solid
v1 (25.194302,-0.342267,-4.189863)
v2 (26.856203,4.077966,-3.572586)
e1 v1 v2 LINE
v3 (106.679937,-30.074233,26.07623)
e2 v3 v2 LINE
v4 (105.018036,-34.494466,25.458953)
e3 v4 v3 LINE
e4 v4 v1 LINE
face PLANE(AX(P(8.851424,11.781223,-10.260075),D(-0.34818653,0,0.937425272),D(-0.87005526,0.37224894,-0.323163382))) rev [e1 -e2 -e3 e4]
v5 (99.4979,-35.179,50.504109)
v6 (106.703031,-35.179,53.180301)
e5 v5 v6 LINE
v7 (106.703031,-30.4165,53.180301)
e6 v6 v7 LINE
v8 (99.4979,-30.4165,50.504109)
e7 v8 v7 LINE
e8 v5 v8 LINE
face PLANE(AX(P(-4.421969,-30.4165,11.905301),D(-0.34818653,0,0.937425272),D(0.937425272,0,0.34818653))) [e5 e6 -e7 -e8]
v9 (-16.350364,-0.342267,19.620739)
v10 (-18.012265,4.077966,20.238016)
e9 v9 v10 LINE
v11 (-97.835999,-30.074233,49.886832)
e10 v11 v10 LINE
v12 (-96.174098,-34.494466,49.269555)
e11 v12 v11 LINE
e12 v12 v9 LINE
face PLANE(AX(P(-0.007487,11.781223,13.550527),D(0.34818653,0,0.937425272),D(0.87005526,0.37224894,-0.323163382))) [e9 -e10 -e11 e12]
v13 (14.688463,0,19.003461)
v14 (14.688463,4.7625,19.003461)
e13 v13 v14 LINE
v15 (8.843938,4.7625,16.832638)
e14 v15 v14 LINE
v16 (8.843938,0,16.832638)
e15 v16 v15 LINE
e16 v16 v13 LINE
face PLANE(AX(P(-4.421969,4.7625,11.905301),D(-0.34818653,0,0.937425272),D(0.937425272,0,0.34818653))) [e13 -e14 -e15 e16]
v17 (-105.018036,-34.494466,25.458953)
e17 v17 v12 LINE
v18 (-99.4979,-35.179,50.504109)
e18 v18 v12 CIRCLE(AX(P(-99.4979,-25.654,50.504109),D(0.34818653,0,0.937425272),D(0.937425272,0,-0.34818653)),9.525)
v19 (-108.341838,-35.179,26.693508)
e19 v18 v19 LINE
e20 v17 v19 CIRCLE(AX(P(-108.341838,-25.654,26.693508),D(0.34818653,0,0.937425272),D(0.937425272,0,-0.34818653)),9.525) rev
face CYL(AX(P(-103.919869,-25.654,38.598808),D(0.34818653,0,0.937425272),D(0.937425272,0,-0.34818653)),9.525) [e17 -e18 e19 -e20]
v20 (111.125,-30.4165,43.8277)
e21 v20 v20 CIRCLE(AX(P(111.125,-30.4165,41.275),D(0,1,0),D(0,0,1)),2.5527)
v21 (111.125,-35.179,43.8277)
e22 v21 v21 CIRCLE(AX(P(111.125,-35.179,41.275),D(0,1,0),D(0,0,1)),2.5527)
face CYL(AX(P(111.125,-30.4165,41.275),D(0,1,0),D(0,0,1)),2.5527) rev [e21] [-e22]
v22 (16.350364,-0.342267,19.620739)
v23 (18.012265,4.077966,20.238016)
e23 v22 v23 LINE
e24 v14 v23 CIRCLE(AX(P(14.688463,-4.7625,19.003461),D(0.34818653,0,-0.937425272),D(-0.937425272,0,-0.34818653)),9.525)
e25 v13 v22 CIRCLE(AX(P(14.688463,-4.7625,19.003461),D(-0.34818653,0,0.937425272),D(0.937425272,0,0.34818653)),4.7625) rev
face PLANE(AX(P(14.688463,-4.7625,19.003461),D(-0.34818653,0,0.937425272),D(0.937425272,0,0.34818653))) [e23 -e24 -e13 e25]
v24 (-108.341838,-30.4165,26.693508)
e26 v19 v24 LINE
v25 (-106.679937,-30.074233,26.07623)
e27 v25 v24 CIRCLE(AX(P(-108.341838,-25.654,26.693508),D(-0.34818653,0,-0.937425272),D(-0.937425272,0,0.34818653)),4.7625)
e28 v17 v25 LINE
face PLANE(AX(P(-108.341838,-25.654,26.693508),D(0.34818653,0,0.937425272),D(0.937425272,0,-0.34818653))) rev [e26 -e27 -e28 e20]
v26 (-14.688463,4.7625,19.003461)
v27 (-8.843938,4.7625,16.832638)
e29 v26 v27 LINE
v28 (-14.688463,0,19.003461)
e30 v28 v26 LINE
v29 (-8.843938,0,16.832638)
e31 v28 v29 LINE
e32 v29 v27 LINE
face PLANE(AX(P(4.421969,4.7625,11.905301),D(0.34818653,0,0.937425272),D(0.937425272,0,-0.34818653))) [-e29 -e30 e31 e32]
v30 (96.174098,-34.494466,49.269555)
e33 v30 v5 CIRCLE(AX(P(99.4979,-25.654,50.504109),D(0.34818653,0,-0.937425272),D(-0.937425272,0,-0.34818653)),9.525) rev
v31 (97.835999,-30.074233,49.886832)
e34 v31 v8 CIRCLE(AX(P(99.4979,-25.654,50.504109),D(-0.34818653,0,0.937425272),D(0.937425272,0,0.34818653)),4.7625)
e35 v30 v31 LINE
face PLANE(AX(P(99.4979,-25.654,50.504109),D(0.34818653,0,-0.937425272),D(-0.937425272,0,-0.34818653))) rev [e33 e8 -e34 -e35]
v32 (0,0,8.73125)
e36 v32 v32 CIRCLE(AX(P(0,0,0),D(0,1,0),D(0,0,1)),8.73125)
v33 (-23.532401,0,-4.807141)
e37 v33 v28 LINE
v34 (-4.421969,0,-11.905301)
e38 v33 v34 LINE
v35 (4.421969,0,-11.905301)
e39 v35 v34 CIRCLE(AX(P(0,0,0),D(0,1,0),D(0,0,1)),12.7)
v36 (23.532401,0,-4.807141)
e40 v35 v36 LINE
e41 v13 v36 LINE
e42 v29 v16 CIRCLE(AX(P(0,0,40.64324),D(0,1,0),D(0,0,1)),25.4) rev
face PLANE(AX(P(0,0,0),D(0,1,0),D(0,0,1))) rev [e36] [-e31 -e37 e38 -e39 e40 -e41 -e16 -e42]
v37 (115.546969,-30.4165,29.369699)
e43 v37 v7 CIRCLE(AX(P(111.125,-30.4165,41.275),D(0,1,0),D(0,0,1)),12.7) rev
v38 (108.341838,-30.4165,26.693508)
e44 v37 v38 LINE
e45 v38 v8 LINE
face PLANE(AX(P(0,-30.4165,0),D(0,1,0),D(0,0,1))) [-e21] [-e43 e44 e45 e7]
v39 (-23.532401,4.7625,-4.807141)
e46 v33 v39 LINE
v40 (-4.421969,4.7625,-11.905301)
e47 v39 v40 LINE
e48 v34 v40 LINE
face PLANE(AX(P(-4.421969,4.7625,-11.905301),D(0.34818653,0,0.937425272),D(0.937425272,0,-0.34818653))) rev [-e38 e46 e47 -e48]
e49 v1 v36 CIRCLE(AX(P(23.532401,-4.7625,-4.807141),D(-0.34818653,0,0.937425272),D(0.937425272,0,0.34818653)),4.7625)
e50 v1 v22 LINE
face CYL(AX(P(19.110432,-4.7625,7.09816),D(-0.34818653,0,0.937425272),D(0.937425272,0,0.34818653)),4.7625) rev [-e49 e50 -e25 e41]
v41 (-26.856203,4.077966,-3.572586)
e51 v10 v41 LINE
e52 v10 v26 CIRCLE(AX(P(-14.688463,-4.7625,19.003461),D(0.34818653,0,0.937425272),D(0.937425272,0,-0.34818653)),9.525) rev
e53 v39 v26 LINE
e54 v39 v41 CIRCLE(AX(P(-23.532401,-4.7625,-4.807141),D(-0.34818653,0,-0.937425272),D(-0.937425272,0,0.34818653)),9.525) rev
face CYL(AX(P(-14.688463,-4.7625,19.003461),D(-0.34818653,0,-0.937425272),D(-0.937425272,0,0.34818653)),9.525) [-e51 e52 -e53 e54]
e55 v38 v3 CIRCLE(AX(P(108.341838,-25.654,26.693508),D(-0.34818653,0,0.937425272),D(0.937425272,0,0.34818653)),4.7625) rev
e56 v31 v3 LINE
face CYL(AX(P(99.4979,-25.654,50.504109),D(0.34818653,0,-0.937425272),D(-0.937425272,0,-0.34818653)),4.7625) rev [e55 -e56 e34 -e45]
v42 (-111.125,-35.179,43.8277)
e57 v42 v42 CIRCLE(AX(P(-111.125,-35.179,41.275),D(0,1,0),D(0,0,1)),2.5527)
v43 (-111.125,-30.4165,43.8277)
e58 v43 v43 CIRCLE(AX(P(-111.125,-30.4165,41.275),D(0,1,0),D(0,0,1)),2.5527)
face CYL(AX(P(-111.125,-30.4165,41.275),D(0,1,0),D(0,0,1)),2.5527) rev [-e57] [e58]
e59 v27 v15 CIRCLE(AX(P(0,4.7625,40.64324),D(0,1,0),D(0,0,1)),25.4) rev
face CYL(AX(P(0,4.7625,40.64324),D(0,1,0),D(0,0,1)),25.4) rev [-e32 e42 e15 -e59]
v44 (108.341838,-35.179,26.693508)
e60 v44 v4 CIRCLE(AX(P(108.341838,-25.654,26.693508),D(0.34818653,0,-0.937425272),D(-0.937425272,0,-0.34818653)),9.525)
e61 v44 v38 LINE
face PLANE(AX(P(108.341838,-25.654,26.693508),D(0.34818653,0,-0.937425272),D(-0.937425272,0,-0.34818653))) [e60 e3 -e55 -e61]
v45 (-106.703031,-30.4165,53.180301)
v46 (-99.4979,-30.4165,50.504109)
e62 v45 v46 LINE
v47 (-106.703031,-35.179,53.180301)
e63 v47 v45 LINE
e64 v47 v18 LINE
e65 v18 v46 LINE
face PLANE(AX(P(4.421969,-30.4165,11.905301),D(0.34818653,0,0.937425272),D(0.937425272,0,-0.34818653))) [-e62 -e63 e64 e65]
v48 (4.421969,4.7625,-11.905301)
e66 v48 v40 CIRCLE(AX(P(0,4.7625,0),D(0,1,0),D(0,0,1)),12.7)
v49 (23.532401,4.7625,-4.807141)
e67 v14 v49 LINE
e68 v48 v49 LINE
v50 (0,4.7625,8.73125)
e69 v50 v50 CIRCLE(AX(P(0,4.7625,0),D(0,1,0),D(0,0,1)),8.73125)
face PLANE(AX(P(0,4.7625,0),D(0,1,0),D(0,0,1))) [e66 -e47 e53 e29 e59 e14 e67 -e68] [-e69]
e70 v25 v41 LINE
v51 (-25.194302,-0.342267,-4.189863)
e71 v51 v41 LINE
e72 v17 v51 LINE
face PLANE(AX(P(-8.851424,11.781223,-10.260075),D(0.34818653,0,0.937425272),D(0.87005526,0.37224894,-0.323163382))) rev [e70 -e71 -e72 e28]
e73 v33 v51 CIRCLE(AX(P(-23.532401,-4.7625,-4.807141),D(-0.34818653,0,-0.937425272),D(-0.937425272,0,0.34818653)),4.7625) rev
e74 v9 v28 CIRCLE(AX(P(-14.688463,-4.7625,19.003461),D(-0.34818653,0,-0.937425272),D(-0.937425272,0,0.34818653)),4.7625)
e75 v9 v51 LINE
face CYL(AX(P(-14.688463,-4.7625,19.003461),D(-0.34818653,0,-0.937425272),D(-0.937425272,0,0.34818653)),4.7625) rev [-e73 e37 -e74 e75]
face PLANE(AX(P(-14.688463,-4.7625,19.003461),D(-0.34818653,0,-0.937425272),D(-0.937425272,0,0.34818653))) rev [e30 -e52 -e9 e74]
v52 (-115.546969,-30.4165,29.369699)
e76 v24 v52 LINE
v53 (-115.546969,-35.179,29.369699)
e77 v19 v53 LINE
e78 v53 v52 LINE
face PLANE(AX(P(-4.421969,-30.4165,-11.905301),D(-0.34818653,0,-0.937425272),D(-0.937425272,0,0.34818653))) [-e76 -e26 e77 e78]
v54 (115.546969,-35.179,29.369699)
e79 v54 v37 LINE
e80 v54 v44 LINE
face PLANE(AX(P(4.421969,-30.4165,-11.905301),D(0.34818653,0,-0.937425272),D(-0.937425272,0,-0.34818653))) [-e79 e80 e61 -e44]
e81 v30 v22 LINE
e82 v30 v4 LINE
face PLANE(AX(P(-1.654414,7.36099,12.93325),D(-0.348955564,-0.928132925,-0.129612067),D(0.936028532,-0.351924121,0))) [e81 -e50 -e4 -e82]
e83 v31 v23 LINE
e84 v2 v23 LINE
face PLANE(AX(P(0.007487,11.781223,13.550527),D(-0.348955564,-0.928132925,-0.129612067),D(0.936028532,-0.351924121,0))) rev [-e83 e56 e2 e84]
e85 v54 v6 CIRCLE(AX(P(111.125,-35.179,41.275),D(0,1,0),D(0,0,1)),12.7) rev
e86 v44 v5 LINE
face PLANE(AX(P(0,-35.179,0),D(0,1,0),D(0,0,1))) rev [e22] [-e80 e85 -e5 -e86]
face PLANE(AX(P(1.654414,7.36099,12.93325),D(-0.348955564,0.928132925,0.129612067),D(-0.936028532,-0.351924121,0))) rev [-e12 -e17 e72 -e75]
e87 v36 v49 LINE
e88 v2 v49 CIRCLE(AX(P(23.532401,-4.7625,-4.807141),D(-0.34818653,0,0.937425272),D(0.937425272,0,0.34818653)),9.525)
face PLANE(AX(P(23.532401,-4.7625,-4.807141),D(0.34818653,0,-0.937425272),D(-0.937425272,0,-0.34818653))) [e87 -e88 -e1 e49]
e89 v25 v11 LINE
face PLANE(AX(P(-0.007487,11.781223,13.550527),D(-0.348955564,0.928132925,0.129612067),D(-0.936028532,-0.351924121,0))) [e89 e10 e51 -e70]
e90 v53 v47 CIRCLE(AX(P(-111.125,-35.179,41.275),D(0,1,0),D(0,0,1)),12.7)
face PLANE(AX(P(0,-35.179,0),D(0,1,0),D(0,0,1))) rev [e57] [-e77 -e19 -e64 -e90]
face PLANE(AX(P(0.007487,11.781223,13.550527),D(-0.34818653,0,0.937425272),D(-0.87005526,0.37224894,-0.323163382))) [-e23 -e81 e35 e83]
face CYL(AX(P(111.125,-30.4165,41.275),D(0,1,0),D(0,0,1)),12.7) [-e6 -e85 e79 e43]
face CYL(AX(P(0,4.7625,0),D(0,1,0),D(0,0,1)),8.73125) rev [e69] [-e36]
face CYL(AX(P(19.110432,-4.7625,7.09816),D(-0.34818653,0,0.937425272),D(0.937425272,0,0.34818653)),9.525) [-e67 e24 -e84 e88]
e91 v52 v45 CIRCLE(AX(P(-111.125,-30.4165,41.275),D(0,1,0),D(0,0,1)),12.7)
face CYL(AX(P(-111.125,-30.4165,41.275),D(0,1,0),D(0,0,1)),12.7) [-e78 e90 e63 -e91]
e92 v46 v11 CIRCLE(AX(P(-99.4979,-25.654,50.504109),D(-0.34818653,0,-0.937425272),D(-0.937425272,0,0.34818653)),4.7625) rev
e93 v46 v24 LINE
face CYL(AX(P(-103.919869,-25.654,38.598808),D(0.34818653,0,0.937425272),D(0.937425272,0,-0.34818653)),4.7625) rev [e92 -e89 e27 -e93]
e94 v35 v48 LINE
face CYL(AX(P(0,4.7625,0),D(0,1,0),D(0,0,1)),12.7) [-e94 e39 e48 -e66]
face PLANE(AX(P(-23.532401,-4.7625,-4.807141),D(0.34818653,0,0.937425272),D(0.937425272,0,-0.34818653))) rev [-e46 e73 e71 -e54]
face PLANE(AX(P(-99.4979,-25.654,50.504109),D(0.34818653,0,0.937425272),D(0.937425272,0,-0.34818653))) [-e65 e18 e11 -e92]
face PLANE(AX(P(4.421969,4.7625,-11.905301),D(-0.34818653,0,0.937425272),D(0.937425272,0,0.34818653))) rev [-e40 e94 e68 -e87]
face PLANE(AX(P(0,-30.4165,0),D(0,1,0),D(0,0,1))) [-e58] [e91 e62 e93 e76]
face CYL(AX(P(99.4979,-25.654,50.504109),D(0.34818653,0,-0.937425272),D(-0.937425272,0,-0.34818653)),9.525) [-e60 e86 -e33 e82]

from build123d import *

# Parameters (mm, degrees)
SKETCH1_R              = 12.7
SKETCH1_R_2            = 8.73125
BOSS_EXTRUDE1_DEPTH    = 4.7625
BOSS_EXTRUDE5_DEPTH    = 4.7625
BOSS_EXTRUDE2_DEPTH    = 4.7625
BOSS_EXTRUDE2_2_DEPTH  = 4.7625
BOSS_EXTRUDE3_DEPTH    = 12.7
FILLET2_R              = 25.4
F_10_CLEARANCE_HOLE1_D = 5.1054
CONVERT_SOLID1_START   = -12.7
CONVERT_SOLID1_DEPTH   = 25.4
CONVERT_SOLID1_2_DEPTH = 25.4
CONVERT_SOLID1_3_DEPTH = 25.4
CONVERT_SOLID1_4_DEPTH = 25.4


# Read off the part's stored shape, not the designer's step: Convert-Solid1
with BuildPart() as part:
    # Sketch1 → Boss-Extrude1 (new body)
    with BuildSketch(Plane(origin=(0, 0, 0), x_dir=(1, 0, 0), z_dir=(0, 1, 0))):
        with Locations(Location((0, 0, 0), (0, 0, 90))):
            Circle(SKETCH1_R)
        with Locations(Location((0, 0, 0), (0, 0, 90))):
            Circle(SKETCH1_R_2, mode=Mode.SUBTRACT)
    extrude(amount=BOSS_EXTRUDE1_DEPTH)

    # Sketch1<5> → Boss-Extrude5 (add)
    with BuildSketch(Plane(origin=(0, 0, 0), x_dir=(1, 0, 0), z_dir=(0, 1, 0))):
        with BuildLine():
            Line((-25.256245596, 4.166855334), (-16.412307744, -19.643746575))
            Line((-16.412307744, -19.643746575), (0, -13.547746556))
            Line((0, -13.547746556), (-4.421968926, -11.905300955))
            ThreePointArc((-4.421968926, -11.905300955), (-12.7, 0), (-4.421968926, 11.905300955))
            Line((-4.421968926, 11.905300955), (-25.256245596, 4.166855334))
        make_face()
        with BuildLine():
            Line((-4.421968926, -11.905300955), (0, -13.547746556))
            Line((0, -13.547746556), (4.421968926, -11.905300955))
            ThreePointArc((4.421968926, -11.905300955), (0, -12.7), (-4.421968926, -11.905300955))
        make_face()
        with BuildLine():
            Line((4.421968926, -11.905300955), (0, -13.547746556))
            Line((0, -13.547746556), (16.412307744, -19.643746575))
            Line((16.412307744, -19.643746575), (25.256245596, 4.166855334))
            Line((25.256245596, 4.166855334), (4.421968926, 11.905300955))
            ThreePointArc((4.421968926, 11.905300955), (10.427104233, 7.250206709), (12.7, 0))
            ThreePointArc((12.7, 0), (10.427104233, -7.250206709), (4.421968926, -11.905300955))
        make_face()
    extrude(amount=BOSS_EXTRUDE5_DEPTH)



with BuildPart() as body_2:
    # Sketch3 → Boss-Extrude2 (new body)
    with BuildSketch(Plane(origin=(0, -35.179, 0), x_dir=(1, 0, 0), z_dir=(0, 1, 0))):
        with BuildLine():
            Line((-106.61799321, -26.053222351), (-115.546968926, -29.369699045))
            ThreePointArc((-115.546968926, -29.369699045), (-123.030300955, -45.696968926), (-106.703031074, -53.180300955))
            Line((-106.703031074, -53.180300955), (-97.774055358, -49.86382426))
            Line((-97.774055358, -49.86382426), (-106.61799321, -26.053222351))
        make_face()
    extrude(amount=BOSS_EXTRUDE2_DEPTH)


with BuildPart() as body_3:
    # Sketch3 → Boss-Extrude2 2 (new body)
    with BuildSketch(Plane(origin=(0, -35.179, 0), x_dir=(1, 0, 0), z_dir=(0, 1, 0))):
        with BuildLine():
            ThreePointArc((115.546968926, -29.369699045), (123.030300955, -45.696968926), (106.703031074, -53.180300955))
            Line((106.703031074, -53.180300955), (97.774055358, -49.86382426))
            Line((97.774055358, -49.86382426), (106.61799321, -26.053222351))
            Line((106.61799321, -26.053222351), (115.546968926, -29.369699045))
        make_face()
    extrude(amount=BOSS_EXTRUDE2_2_DEPTH)


with BuildPart() as part_1:
    add(part.part)

    add(body_2.part)  # Boss-Extrude3 merges body 2
    # Sketch4 → Boss-Extrude3 (add, symmetric)
    with BuildSketch(Plane(origin=(0, 0, 0), x_dir=(0.9374252720097653, 0, -0.34818652960362706), z_dir=(0.34818652960362706, 0, 0.9374252720097653))):
        Polygon((-109.937239497, -30.4165), (-109.017782361, -30.4165), (-109.017782361, -35.179), (-21.305542864, 0), (-22.225, 0), (-22.225, 4.7625), align=None)
    boss_extrude3 = extrude(amount=BOSS_EXTRUDE3_DEPTH, both=True)

    # Mirror1: Boss-Extrude3 across plane
    add(boss_extrude3.mirror(Plane(origin=(0, 0, 0), x_dir=(0, 0, 1), z_dir=(1, 0, 0))))


with BuildPart() as body_3_1:
    add(body_3.part)

    # Combine1: union part
    add(part_1.part)

    # Fillet2
    fillet2_edges = [body_3_1.edges().sort_by_distance(p)[0] for p in [
        (0, 2.38125, 13.547746556),
    ]]
    fillet(fillet2_edges, radius=FILLET2_R)

    # #10 Clearance Hole1 (through all)
    with Locations(Plane(origin=(0, -30.4165, 0), x_dir=(1, 0, 0), z_dir=(0, 1, 0))):
        with Locations((-111.125, -41.275), (111.125, -41.275)):
            Hole(F_10_CLEARANCE_HOLE1_D / 2)

    # Convert-Solid1 outline → Convert-Solid1 (add)
    with BuildSketch(Plane(origin=(0, 0, 0), x_dir=(0.9374252720097653, 0, -0.3481865296036272), z_dir=(0.34818652960362717, 0, 0.9374252720097654)).offset(CONVERT_SOLID1_START)):
        with BuildLine():
            ThreePointArc((-109.083861056, -30.074233056), (-109.953910301, -30.330150456), (-110.856696633, -30.4165))
            Line((-110.856696633, -30.4165), (-109.937239497, -30.4165))
            Line((-109.937239497, -30.4165), (-109.083861056, -30.074233056))
        make_face()
        with BuildLine():
            Line((-21.305542864, 0), (-22.158921305, -0.342266944))
            ThreePointArc((-22.158921305, -0.342266944), (-21.28887206, -0.086349544), (-20.386085729, 0))
            Line((-20.386085729, 0), (-21.305542864, 0))
        make_face()
    extrude(amount=CONVERT_SOLID1_DEPTH)

    # Convert-Solid1 2 outline → Convert-Solid1 2 (add)
    with BuildSketch(Plane(origin=(0, 0, 0), x_dir=(0.9374252720097653, 0, 0.3481865296036272), z_dir=(0.34818652960362717, 0, -0.9374252720097654)).offset(CONVERT_SOLID1_START)):
        with BuildLine():
            ThreePointArc((109.083861056, 30.074233056), (109.953910301, 30.330150456), (110.856696633, 30.4165))
            Line((110.856696633, 30.4165), (109.937239497, 30.4165))
            Line((109.937239497, 30.4165), (109.083861056, 30.074233056))
        make_face()
        with BuildLine():
            Line((21.305542864, 0), (22.158921305, 0.342266944))
            ThreePointArc((22.158921305, 0.342266944), (21.28887206, 0.086349544), (20.386085729, 0))
            Line((20.386085729, 0), (21.305542864, 0))
        make_face()
    extrude(amount=CONVERT_SOLID1_2_DEPTH)

    # Convert-Solid1 3 outline → Convert-Solid1 3 (cut)
    with BuildSketch(Plane(origin=(0, 0, 0), x_dir=(0.9374252720097653, 0, -0.3481865296036272), z_dir=(0.34818652960362717, 0, 0.9374252720097654)).offset(CONVERT_SOLID1_START)):
        with BuildLine():
            Line((-22.225, 4.7625), (-23.931756882, 4.077966112))
            ThreePointArc((-23.931756882, 4.077966112), (-22.191658392, 4.589800912), (-20.386085729, 4.7625))
            Line((-20.386085729, 4.7625), (-22.225, 4.7625))
        make_face()
        with BuildLine():
            ThreePointArc((-107.31102548, -34.494466112), (-109.05112397, -35.006300912), (-110.856696633, -35.179))
            Line((-110.856696633, -35.179), (-109.017782361, -35.179))
            Line((-109.017782361, -35.179), (-107.31102548, -34.494466112))
        make_face()
    extrude(amount=CONVERT_SOLID1_3_DEPTH, mode=Mode.SUBTRACT)

    # Convert-Solid1 4 outline → Convert-Solid1 4 (cut)
    with BuildSketch(Plane(origin=(0, 0, 0), x_dir=(0.9374252720097653, 0, 0.3481865296036272), z_dir=(0.34818652960362717, 0, -0.9374252720097654)).offset(CONVERT_SOLID1_START)):
        with BuildLine():
            Line((22.225, -4.7625), (23.931756882, -4.077966112))
            ThreePointArc((23.931756882, -4.077966112), (22.191658392, -4.589800912), (20.386085729, -4.7625))
            Line((20.386085729, -4.7625), (22.225, -4.7625))
        make_face()
        with BuildLine():
            ThreePointArc((107.31102548, 34.494466112), (109.05112397, 35.006300912), (110.856696633, 35.179))
            Line((110.856696633, 35.179), (109.017782361, 35.179))
            Line((109.017782361, 35.179), (107.31102548, 34.494466112))
        make_face()
    extrude(amount=CONVERT_SOLID1_4_DEPTH, mode=Mode.SUBTRACT)


solid = body_3_1.part
